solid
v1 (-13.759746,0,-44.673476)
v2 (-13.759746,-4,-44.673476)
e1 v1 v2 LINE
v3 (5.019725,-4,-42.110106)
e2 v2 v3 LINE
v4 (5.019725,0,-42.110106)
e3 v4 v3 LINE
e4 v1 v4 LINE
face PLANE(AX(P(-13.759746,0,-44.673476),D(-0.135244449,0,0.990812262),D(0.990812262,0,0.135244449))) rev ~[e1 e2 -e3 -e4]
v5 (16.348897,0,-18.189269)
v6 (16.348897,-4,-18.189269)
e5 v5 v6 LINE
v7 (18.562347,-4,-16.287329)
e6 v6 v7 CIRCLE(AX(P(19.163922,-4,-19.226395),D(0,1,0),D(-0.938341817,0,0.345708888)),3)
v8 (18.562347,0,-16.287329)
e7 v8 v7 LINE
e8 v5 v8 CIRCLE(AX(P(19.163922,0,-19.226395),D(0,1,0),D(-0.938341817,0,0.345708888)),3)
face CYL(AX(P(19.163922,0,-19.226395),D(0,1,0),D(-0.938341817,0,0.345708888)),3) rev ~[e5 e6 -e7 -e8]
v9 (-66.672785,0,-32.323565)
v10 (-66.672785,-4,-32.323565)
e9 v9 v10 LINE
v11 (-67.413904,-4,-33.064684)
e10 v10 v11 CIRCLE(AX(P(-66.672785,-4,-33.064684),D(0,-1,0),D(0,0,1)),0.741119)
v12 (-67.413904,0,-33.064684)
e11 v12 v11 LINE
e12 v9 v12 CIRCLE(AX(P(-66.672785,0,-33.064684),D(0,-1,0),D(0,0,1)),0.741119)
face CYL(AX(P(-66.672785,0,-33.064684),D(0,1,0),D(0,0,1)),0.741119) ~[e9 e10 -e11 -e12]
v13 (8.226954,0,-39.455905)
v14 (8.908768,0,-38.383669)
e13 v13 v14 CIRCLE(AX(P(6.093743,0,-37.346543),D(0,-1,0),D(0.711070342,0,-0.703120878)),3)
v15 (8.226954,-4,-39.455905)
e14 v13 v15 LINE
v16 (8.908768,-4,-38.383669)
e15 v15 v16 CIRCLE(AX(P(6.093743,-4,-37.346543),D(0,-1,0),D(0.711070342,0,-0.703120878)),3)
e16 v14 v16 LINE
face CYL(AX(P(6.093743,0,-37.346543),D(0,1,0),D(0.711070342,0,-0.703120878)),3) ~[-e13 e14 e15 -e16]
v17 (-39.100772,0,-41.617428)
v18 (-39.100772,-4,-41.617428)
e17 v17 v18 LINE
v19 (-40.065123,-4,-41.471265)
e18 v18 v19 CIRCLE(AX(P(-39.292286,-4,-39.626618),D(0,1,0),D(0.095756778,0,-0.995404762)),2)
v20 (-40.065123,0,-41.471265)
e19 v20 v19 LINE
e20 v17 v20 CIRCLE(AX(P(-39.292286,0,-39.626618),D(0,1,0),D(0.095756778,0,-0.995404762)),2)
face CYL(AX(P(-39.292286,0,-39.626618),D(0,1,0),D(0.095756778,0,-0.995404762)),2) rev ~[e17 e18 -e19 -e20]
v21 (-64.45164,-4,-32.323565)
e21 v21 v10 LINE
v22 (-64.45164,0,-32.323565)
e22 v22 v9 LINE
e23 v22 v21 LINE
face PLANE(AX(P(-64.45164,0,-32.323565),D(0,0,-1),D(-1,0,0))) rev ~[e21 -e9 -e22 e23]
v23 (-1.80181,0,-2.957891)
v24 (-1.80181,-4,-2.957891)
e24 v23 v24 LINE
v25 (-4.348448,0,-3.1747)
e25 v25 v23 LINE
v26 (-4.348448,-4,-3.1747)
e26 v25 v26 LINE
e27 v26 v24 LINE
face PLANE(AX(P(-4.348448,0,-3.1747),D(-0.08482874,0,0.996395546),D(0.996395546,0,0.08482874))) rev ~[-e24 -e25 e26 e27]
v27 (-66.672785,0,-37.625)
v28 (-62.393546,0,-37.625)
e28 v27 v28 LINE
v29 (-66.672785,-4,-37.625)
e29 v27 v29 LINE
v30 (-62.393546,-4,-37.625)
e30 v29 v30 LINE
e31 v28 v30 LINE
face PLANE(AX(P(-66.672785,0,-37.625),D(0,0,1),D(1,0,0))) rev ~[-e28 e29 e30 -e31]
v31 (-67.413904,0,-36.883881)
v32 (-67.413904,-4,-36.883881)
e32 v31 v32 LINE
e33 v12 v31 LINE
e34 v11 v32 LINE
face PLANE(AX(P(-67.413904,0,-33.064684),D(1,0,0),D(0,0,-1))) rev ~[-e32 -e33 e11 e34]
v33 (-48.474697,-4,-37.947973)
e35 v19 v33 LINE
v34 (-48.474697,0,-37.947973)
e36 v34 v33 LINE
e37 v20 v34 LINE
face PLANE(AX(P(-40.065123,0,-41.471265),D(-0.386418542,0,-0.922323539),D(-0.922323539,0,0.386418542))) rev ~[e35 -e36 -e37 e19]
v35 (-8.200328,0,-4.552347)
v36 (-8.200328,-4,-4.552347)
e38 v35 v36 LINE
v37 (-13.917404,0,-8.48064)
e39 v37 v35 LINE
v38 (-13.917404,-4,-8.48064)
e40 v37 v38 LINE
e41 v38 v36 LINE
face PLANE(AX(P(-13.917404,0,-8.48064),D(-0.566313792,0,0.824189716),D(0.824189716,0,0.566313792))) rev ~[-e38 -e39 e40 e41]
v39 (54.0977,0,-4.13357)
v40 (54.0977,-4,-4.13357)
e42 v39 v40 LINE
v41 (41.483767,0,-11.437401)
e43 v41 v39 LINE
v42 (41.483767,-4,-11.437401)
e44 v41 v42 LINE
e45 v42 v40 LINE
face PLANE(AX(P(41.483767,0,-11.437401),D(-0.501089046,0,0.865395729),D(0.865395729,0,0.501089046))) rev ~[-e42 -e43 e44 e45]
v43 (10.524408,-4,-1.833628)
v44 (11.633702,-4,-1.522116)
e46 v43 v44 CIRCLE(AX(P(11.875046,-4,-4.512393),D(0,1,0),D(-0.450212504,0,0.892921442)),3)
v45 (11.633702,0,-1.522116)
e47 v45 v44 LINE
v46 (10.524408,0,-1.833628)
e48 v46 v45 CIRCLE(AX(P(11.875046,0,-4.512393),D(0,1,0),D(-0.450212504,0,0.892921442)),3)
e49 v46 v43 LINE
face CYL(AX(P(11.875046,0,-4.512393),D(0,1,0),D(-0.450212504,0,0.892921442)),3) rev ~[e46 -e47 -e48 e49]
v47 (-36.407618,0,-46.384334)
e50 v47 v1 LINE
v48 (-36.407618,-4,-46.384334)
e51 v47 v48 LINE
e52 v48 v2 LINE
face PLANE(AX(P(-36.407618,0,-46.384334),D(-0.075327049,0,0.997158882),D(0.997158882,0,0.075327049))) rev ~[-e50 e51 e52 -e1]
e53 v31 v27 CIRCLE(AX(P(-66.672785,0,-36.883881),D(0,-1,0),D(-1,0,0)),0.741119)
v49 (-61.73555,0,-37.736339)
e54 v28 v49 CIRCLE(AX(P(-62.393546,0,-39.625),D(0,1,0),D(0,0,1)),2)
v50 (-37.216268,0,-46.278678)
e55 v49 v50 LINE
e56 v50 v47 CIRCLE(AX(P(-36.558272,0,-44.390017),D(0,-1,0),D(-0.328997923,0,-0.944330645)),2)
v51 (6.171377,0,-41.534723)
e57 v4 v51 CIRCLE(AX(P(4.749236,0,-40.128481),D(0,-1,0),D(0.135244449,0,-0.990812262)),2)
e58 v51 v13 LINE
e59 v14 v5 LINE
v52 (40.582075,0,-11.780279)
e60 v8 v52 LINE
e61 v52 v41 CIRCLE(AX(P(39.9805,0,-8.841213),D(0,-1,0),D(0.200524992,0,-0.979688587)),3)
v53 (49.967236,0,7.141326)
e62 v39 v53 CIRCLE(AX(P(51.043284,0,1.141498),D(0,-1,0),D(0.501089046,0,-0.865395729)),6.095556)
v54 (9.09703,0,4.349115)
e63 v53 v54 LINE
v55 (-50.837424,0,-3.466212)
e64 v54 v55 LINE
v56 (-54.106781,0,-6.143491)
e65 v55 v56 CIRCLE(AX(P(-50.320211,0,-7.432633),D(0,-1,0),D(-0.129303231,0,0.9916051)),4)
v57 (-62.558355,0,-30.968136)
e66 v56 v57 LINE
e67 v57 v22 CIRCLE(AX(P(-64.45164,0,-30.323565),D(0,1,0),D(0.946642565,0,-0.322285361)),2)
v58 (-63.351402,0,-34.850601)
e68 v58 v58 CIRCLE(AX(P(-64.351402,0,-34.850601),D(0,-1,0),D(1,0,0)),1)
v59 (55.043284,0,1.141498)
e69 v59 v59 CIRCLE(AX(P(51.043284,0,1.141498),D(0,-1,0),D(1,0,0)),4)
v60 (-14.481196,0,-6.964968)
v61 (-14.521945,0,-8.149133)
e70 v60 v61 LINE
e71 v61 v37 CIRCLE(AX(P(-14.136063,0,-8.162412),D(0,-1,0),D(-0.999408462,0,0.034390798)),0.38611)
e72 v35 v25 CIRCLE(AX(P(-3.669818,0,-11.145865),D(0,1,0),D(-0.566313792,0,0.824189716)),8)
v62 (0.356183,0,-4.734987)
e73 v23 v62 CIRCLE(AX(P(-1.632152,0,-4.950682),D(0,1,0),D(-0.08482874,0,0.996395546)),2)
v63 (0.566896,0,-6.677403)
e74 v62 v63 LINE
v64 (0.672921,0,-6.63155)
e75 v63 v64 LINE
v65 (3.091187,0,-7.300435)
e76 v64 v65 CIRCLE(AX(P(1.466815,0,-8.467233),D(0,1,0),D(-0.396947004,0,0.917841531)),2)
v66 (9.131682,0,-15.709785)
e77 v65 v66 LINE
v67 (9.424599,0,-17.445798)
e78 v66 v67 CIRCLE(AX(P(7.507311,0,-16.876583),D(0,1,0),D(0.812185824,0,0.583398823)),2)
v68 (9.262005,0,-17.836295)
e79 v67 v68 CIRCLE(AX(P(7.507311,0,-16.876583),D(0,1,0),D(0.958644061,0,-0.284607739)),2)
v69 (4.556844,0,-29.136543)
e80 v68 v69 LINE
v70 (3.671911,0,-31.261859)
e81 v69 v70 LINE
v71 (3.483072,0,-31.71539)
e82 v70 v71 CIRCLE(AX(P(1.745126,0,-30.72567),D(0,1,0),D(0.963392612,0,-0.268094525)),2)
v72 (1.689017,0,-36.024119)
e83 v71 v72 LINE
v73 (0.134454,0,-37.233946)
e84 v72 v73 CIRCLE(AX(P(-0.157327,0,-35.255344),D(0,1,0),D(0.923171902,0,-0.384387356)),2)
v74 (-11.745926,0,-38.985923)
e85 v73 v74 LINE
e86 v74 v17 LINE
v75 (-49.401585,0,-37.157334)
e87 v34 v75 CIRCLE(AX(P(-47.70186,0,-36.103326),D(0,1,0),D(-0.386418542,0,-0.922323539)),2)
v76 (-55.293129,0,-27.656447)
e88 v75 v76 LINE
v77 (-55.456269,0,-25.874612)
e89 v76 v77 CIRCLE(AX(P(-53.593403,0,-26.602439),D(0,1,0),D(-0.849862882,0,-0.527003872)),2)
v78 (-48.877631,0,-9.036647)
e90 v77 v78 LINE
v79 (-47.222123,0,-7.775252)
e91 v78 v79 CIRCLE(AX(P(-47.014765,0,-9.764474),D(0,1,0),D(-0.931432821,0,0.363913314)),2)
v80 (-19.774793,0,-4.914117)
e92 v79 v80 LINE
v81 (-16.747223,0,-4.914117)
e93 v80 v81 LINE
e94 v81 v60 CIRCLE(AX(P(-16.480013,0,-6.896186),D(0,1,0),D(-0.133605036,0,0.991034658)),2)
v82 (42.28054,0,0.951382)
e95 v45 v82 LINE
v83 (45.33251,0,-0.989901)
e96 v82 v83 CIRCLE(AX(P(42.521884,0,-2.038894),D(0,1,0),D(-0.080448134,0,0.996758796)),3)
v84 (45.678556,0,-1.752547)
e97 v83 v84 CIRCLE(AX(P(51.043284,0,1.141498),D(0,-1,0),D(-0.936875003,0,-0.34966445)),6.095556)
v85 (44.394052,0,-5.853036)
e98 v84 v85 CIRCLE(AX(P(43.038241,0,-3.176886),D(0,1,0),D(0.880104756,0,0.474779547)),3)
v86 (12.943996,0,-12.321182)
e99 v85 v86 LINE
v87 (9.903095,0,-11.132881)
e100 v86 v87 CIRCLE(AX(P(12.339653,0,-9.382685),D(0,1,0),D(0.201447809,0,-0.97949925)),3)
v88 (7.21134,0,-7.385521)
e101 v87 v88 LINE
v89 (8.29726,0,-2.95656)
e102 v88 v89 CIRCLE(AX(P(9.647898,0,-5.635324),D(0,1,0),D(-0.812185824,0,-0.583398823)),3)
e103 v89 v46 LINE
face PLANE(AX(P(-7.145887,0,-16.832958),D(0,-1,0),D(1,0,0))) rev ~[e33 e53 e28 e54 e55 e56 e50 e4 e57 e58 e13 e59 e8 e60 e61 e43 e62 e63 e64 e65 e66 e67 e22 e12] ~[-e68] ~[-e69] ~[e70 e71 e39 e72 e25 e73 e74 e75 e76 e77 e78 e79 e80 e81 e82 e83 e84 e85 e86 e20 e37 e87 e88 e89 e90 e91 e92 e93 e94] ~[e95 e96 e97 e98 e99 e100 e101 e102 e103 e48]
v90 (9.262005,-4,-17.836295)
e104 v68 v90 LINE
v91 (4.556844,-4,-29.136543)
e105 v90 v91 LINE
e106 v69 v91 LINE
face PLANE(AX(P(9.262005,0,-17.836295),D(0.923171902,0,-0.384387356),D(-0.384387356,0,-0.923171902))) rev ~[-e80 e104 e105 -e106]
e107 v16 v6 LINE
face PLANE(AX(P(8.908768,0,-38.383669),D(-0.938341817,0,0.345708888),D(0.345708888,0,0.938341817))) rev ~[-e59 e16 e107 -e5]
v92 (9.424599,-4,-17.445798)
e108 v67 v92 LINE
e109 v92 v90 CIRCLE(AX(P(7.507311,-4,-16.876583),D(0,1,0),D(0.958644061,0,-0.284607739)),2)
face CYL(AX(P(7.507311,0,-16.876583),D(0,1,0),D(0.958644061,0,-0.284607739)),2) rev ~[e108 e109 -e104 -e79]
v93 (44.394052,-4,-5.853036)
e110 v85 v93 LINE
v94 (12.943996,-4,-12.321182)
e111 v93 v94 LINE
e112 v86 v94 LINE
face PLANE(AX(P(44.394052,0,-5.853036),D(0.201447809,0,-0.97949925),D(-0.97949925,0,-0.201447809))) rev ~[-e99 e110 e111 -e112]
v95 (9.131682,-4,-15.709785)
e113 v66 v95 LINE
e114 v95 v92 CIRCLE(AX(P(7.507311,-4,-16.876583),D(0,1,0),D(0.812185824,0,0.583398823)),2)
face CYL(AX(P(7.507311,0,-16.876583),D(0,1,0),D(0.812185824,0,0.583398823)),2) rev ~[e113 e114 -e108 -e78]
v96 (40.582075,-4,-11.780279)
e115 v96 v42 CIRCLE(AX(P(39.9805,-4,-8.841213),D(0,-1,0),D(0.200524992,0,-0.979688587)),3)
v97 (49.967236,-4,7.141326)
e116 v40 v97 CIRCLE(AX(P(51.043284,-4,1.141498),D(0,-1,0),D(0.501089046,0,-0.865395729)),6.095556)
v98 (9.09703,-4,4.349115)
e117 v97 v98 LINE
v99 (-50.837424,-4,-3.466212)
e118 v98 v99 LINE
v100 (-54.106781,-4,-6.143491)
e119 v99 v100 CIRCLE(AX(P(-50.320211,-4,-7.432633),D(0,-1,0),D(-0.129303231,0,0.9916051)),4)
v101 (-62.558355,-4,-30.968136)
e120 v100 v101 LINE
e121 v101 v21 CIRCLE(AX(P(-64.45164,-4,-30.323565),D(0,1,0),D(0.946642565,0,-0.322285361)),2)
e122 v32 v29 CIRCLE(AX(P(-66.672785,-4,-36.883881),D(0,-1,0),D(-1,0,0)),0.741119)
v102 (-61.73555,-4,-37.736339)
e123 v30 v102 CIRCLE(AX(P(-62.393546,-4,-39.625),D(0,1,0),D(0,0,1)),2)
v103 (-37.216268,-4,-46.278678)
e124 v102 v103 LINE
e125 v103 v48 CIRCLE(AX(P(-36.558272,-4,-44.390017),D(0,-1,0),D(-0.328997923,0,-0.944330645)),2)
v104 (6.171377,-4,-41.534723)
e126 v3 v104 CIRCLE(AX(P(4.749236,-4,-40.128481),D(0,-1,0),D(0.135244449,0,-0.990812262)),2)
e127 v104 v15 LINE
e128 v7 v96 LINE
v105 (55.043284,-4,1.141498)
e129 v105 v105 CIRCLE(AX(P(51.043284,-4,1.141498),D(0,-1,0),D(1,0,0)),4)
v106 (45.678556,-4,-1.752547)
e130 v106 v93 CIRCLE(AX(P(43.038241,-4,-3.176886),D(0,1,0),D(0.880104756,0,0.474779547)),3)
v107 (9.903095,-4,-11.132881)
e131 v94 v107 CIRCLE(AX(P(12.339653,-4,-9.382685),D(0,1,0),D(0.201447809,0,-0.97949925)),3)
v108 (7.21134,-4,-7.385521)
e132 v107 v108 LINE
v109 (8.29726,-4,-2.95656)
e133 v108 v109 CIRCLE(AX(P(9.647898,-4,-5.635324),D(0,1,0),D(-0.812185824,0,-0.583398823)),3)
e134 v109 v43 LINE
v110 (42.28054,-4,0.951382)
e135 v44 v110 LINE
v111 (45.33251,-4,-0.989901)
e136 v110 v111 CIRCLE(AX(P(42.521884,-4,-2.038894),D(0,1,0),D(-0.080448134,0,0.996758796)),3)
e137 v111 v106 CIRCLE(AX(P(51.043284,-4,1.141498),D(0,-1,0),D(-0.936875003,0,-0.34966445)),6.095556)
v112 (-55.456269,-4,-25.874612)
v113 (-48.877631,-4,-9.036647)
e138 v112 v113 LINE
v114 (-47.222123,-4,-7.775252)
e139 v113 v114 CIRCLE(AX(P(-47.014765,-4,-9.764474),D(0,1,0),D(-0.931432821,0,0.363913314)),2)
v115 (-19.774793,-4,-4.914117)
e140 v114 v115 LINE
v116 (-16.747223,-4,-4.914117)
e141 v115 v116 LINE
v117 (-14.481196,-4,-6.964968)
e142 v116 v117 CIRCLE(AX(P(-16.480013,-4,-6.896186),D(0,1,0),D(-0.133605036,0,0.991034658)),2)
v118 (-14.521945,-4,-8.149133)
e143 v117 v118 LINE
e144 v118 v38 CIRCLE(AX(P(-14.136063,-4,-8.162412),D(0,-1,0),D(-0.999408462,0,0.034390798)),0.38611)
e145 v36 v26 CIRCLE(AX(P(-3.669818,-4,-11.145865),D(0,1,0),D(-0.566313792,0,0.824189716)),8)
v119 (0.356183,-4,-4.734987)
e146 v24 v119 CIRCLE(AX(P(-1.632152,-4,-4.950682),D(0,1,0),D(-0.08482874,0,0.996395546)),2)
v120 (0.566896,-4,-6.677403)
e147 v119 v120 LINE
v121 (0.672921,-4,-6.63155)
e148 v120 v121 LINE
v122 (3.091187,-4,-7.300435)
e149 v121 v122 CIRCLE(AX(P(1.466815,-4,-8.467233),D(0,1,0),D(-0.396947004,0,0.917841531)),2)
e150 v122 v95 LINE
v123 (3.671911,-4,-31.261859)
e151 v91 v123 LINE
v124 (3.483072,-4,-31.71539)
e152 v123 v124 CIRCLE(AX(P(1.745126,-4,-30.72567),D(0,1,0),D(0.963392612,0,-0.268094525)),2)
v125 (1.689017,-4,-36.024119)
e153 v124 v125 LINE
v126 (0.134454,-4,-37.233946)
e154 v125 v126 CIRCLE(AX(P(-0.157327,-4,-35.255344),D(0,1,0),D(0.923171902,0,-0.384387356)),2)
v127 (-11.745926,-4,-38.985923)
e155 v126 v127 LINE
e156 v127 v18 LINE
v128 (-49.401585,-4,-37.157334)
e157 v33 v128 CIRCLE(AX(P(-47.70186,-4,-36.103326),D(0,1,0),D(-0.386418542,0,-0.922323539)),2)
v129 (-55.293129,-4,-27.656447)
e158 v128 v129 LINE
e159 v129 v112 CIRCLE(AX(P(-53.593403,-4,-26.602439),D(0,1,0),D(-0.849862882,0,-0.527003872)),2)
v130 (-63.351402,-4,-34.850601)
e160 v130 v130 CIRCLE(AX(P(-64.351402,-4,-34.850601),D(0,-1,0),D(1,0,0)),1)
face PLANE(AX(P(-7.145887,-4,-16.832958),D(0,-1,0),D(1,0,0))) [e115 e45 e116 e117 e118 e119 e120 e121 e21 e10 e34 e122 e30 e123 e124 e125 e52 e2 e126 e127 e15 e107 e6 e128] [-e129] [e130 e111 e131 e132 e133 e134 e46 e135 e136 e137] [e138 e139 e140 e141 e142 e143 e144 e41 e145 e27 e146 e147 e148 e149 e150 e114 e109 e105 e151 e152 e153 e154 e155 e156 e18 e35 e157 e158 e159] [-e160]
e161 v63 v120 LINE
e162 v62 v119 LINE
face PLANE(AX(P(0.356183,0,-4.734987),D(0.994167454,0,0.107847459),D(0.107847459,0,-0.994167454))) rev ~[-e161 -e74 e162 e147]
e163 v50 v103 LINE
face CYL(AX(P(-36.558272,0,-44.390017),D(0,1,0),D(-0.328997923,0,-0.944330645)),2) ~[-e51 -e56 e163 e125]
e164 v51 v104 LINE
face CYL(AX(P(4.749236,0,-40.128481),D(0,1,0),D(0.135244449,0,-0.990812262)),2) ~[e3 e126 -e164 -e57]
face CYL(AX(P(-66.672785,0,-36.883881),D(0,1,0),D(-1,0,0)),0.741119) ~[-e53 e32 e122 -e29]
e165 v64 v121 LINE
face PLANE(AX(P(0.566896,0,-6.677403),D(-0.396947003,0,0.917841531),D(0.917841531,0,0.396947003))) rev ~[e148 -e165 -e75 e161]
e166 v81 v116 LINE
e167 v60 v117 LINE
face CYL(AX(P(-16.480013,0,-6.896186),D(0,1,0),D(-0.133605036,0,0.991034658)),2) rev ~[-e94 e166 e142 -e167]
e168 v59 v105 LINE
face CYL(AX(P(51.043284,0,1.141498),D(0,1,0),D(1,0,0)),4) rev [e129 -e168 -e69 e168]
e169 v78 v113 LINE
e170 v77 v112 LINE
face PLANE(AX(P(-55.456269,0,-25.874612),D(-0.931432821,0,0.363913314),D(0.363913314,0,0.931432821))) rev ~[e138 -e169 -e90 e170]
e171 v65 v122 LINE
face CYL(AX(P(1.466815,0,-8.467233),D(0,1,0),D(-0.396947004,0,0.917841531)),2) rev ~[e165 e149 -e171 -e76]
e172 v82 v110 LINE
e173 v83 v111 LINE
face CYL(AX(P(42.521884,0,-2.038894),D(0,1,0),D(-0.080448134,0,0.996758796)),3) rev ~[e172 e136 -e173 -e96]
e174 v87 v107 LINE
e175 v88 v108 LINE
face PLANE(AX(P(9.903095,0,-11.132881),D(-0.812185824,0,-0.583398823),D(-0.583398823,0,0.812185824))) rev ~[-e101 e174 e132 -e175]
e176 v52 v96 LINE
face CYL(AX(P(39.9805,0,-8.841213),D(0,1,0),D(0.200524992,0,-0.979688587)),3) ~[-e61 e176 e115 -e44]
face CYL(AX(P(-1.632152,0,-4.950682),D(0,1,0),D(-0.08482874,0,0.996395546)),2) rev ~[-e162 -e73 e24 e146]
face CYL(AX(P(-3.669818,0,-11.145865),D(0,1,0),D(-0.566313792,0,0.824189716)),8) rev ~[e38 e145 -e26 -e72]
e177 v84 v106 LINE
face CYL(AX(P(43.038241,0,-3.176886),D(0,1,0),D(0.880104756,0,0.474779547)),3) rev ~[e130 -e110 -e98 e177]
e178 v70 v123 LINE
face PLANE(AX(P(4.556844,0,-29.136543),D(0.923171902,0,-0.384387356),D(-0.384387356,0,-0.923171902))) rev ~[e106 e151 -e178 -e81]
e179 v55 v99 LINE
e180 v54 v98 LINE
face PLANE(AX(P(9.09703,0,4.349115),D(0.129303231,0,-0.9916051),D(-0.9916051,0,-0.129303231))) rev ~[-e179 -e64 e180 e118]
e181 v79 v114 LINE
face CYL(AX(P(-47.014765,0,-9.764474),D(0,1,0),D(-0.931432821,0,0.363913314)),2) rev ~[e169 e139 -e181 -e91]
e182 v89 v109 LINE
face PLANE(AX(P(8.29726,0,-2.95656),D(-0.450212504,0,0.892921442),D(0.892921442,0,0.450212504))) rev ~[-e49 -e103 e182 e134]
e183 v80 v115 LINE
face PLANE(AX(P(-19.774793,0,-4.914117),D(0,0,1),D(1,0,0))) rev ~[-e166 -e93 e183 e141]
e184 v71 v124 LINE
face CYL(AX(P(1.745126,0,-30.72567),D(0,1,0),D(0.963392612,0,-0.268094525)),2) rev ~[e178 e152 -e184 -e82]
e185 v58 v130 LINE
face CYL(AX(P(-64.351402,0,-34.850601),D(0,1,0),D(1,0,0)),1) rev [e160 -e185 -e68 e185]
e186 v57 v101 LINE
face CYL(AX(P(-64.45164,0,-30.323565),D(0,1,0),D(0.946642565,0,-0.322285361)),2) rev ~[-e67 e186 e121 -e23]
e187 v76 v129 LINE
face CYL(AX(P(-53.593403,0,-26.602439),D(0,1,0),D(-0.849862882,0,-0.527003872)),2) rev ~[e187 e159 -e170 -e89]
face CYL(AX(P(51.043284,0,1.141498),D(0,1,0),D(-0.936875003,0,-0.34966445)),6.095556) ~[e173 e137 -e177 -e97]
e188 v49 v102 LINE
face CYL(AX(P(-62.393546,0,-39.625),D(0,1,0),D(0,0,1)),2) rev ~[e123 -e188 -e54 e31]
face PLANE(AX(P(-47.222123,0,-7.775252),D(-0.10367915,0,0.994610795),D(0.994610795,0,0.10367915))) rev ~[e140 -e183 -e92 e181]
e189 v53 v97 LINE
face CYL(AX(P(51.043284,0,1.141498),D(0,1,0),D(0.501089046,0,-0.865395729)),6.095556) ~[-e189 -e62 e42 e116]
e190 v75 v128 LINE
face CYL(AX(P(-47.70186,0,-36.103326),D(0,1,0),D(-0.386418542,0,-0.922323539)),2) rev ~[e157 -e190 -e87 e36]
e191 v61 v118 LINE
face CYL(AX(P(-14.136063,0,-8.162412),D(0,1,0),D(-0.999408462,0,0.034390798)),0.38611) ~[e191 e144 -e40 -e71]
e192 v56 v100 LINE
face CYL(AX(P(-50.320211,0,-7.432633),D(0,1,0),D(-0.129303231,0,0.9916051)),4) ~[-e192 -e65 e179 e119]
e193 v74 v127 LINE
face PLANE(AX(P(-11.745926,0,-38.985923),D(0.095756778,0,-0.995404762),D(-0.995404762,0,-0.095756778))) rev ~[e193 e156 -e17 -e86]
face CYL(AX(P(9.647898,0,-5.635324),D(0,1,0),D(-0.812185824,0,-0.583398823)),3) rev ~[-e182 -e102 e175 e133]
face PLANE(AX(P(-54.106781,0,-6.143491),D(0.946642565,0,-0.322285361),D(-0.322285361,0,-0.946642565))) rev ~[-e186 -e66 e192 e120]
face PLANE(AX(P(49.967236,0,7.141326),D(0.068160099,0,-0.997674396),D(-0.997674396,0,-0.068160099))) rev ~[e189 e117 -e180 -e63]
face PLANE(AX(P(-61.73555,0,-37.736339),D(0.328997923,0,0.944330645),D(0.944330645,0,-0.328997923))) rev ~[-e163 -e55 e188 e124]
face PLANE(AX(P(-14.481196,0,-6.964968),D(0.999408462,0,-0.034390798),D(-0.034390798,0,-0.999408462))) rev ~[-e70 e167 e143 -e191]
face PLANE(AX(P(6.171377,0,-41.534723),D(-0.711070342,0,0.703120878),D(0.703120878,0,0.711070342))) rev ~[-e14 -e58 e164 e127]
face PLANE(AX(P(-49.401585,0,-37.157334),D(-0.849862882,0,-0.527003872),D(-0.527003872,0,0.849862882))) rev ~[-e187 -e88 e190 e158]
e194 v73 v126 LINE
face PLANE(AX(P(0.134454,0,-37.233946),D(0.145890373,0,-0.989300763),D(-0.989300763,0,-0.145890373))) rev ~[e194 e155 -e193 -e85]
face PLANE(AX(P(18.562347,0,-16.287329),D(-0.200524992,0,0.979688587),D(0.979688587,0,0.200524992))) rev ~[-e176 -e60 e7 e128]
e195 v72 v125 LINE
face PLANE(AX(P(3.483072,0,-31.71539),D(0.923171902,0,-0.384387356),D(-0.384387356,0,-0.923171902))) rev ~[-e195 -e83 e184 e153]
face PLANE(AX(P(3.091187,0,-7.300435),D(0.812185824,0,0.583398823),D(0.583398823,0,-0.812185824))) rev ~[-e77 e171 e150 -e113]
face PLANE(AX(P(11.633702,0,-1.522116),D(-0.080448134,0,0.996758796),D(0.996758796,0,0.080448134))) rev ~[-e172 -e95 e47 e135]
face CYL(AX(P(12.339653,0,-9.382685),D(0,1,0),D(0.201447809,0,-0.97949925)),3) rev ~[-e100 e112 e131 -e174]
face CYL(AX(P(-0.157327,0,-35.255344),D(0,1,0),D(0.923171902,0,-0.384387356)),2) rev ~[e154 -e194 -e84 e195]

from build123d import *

# Parameters (mm, degrees)
F1_R     = 1
F1_R_2   = 4
F2_DEPTH = 4


# Not quite as in the source:
# - a feature names something its author has since deleted; it is built from what else it names


with BuildPart() as f2:
    # F1 (on Front) → F2 (new body)
    with BuildSketch(Plane.XZ):
        with BuildLine():
            ThreePointArc((54.0977004839, -4.1335701552), (56.766858502, 3.238282099), (49.9672364551, 7.1413258089))
            Line((49.9672364551, 7.1413258089), (9.0970295176, 4.3491148777))
            Line((9.0970295176, 4.3491148777), (-50.8374237274, -3.466212469))
            ThreePointArc((-50.8374237274, -3.466212469), (-52.8544943464, -4.3378942821), (-54.1067810637, -6.1434914253))
            Line((-54.1067810637, -6.1434914253), (-62.5583549212, -30.968136056))
            ThreePointArc((-62.5583549212, -30.968136056), (-63.2874110026, -31.9497789492), (-64.4516400514, -32.3235653341))
            Line((-64.4516400514, -32.3235653341), (-66.6727852076, -32.3235653341))
            ThreePointArc((-66.6727852076, -32.3235653341), (-67.1968351707, -32.5406339362), (-67.4139037728, -33.0646838993))
            Line((-67.4139037728, -33.0646838993), (-67.4139037728, -36.8838813156))
            ThreePointArc((-67.4139037728, -36.8838813156), (-67.1968351707, -37.4079312787), (-66.6727852076, -37.6249998808))
            Line((-66.6727852076, -37.6249998808), (-62.3935461021, -37.6249998808))
            ThreePointArc((-62.3935461021, -37.6249998808), (-62.0598715448, -37.6530309942), (-61.7355502568, -37.736338591))
            Line((-61.7355502568, -37.736338591), (-37.2162681051, -46.2786780104))
            ThreePointArc((-37.2162681051, -46.2786780104), (-36.8173856222, -46.3731607561), (-36.4076181612, -46.3843344843))
            Line((-36.4076181612, -46.3843344843), (-13.7597462162, -44.6734763682))
            Line((-13.7597462162, -44.6734763682), (5.0197247755, -42.1101055891))
            ThreePointArc((5.0197247755, -42.1101055891), (5.6431122997, -41.9176107253), (6.1713765615, -41.5347228206))
            Line((6.1713765615, -41.5347228206), (8.2269536442, -39.4559054448))
            ThreePointArc((8.2269536442, -39.4559054448), (8.625280402, -38.9562994549), (8.9087680688, -38.3836694749))
            Line((8.9087680688, -38.3836694749), (16.3488967626, -18.1892685938))
            ThreePointArc((16.3488967626, -18.1892685938), (17.208766797, -16.9510123668), (18.5623472371, -16.2873294968))
            Line((18.5623472371, -16.2873294968), (40.5820753294, -11.7802791422))
            ThreePointArc((40.5820753294, -11.7802791422), (41.0467937044, -11.6453208131), (41.4837674916, -11.4374005686))
            Line((41.4837674916, -11.4374005686), (54.0977004839, -4.1335701552))
        make_face()
        with Locations((-64.3514022231, -34.8506011069)):
            Circle(F1_R, mode=Mode.SUBTRACT)
        with BuildLine():
            ThreePointArc((-16.7472230261, -4.91411715), (-15.1379574632, -5.4133219884), (-14.4811960302, -6.9649680637))
            Line((-14.4811960302, -6.9649680637), (-14.5219445245, -8.1491333606))
            ThreePointArc((-14.5219445245, -8.1491333606), (-14.32171034, -8.5009617779), (-13.9174035461, -8.4806398607))
            Line((-13.9174035461, -8.4806398607), (-8.2003281839, -4.5523469385))
            ThreePointArc((-8.2003281839, -4.5523469385), (-6.3639342341, -3.6131535453), (-4.348447762, -3.1747002983))
            Line((-4.348447762, -3.1747002983), (-1.8018096929, -2.9578907207))
            ThreePointArc((-1.8018096929, -2.9578907207), (-0.3607692656, -3.4067953543), (0.3561826933, -4.7349868962))
            Line((0.3561826933, -4.7349868962), (0.5668963829, -6.67740348))
            Line((0.5668963829, -6.67740348), (0.672921323, -6.6315499412))
            ThreePointArc((0.672921323, -6.6315499412), (1.9999899765, -6.5396114649), (3.091186979, -7.3004353579))
            Line((3.091186979, -7.3004353579), (9.1316822834, -15.7097849605))
            ThreePointArc((9.1316822834, -15.7097849605), (9.4794348377, -16.5438272503), (9.4245987558, -17.4457980836))
            ThreePointArc((9.4245987558, -17.4457980836), (9.3536544385, -17.6453573177), (9.2620047676, -17.8362953231))
            Line((9.2620047676, -17.8362953231), (4.5568440785, -29.1365425288))
            Line((4.5568440785, -29.1365425288), (3.6719114619, -31.2618593858))
            ThreePointArc((3.6719114619, -31.2618593858), (3.5914700409, -31.4944450482), (3.483071784, -31.715390133))
            Line((3.483071784, -31.715390133), (1.6890171815, -36.0241187498))
            ThreePointArc((1.6890171815, -36.0241187498), (1.0710114326, -36.8336930562), (0.1344541234, -37.2339455637))
            Line((0.1344541234, -37.2339455637), (-11.7459257638, -38.985923444))
            Line((-11.7459257638, -38.985923444), (-39.1007720975, -41.6174277811))
            ThreePointArc((-39.1007720975, -41.6174277811), (-39.5919940555, -41.6040344694), (-40.0651227377, -41.4712653355))
            Line((-40.0651227377, -41.4712653355), (-48.4746967713, -37.9479731273))
            ThreePointArc((-48.4746967713, -37.9479731273), (-48.9998078369, -37.6249470931), (-49.401585452, -37.1573337934))
            Line((-49.401585452, -37.1573337934), (-55.2931292161, -27.6564465473))
            ThreePointArc((-55.2931292161, -27.6564465473), (-55.5850730561, -26.7847906202), (-55.4562690933, -25.874612176))
            Line((-55.4562690933, -25.874612176), (-48.8776308187, -9.0366472667))
            ThreePointArc((-48.8776308187, -9.0366472667), (-48.2268856759, -8.1736364118), (-47.2221234757, -7.7752523038))
            Line((-47.2221234757, -7.7752523038), (-19.7747927159, -4.91411715))
            Line((-19.7747927159, -4.91411715), (-16.7472230261, -4.91411715))
        make_face(mode=Mode.SUBTRACT)
        with BuildLine():
            ThreePointArc((7.2113401452, -7.3855209262), (6.7341998146, -4.9209260348), (8.2972601063, -2.9565601324))
            Line((8.2972601063, -2.9565601324), (10.5244084197, -1.8336281786))
            ThreePointArc((10.5244084197, -1.8336281786), (11.0639592867, -1.6241164689), (11.6337015289, -1.5221161154))
            Line((11.6337015289, -1.5221161154), (42.2805400914, 0.9513819838))
            ThreePointArc((42.2805400914, 0.9513819838), (44.1319918409, 0.4924203394), (45.3325095049, -0.989901053))
            ThreePointArc((45.3325095049, -0.989901053), (45.4924194241, -1.3771741585), (45.6785557512, -1.752547184))
            ThreePointArc((45.6785557512, -1.752547184), (45.9010642846, -4.0736832448), (44.3940516522, -5.8530358197))
            Line((44.3940516522, -5.8530358197), (12.9439963939, -12.3211824174))
            ThreePointArc((12.9439963939, -12.3211824174), (11.2477431433, -12.1769167526), (9.9030954921, -11.132881137))
            Line((9.9030954921, -11.132881137), (7.2113401452, -7.3855209262))
        make_face(mode=Mode.SUBTRACT)
        with Locations((51.0432839383, 1.1414983302)):
            Circle(F1_R_2, mode=Mode.SUBTRACT)
    extrude(amount=F2_DEPTH)


solid = f2.part
